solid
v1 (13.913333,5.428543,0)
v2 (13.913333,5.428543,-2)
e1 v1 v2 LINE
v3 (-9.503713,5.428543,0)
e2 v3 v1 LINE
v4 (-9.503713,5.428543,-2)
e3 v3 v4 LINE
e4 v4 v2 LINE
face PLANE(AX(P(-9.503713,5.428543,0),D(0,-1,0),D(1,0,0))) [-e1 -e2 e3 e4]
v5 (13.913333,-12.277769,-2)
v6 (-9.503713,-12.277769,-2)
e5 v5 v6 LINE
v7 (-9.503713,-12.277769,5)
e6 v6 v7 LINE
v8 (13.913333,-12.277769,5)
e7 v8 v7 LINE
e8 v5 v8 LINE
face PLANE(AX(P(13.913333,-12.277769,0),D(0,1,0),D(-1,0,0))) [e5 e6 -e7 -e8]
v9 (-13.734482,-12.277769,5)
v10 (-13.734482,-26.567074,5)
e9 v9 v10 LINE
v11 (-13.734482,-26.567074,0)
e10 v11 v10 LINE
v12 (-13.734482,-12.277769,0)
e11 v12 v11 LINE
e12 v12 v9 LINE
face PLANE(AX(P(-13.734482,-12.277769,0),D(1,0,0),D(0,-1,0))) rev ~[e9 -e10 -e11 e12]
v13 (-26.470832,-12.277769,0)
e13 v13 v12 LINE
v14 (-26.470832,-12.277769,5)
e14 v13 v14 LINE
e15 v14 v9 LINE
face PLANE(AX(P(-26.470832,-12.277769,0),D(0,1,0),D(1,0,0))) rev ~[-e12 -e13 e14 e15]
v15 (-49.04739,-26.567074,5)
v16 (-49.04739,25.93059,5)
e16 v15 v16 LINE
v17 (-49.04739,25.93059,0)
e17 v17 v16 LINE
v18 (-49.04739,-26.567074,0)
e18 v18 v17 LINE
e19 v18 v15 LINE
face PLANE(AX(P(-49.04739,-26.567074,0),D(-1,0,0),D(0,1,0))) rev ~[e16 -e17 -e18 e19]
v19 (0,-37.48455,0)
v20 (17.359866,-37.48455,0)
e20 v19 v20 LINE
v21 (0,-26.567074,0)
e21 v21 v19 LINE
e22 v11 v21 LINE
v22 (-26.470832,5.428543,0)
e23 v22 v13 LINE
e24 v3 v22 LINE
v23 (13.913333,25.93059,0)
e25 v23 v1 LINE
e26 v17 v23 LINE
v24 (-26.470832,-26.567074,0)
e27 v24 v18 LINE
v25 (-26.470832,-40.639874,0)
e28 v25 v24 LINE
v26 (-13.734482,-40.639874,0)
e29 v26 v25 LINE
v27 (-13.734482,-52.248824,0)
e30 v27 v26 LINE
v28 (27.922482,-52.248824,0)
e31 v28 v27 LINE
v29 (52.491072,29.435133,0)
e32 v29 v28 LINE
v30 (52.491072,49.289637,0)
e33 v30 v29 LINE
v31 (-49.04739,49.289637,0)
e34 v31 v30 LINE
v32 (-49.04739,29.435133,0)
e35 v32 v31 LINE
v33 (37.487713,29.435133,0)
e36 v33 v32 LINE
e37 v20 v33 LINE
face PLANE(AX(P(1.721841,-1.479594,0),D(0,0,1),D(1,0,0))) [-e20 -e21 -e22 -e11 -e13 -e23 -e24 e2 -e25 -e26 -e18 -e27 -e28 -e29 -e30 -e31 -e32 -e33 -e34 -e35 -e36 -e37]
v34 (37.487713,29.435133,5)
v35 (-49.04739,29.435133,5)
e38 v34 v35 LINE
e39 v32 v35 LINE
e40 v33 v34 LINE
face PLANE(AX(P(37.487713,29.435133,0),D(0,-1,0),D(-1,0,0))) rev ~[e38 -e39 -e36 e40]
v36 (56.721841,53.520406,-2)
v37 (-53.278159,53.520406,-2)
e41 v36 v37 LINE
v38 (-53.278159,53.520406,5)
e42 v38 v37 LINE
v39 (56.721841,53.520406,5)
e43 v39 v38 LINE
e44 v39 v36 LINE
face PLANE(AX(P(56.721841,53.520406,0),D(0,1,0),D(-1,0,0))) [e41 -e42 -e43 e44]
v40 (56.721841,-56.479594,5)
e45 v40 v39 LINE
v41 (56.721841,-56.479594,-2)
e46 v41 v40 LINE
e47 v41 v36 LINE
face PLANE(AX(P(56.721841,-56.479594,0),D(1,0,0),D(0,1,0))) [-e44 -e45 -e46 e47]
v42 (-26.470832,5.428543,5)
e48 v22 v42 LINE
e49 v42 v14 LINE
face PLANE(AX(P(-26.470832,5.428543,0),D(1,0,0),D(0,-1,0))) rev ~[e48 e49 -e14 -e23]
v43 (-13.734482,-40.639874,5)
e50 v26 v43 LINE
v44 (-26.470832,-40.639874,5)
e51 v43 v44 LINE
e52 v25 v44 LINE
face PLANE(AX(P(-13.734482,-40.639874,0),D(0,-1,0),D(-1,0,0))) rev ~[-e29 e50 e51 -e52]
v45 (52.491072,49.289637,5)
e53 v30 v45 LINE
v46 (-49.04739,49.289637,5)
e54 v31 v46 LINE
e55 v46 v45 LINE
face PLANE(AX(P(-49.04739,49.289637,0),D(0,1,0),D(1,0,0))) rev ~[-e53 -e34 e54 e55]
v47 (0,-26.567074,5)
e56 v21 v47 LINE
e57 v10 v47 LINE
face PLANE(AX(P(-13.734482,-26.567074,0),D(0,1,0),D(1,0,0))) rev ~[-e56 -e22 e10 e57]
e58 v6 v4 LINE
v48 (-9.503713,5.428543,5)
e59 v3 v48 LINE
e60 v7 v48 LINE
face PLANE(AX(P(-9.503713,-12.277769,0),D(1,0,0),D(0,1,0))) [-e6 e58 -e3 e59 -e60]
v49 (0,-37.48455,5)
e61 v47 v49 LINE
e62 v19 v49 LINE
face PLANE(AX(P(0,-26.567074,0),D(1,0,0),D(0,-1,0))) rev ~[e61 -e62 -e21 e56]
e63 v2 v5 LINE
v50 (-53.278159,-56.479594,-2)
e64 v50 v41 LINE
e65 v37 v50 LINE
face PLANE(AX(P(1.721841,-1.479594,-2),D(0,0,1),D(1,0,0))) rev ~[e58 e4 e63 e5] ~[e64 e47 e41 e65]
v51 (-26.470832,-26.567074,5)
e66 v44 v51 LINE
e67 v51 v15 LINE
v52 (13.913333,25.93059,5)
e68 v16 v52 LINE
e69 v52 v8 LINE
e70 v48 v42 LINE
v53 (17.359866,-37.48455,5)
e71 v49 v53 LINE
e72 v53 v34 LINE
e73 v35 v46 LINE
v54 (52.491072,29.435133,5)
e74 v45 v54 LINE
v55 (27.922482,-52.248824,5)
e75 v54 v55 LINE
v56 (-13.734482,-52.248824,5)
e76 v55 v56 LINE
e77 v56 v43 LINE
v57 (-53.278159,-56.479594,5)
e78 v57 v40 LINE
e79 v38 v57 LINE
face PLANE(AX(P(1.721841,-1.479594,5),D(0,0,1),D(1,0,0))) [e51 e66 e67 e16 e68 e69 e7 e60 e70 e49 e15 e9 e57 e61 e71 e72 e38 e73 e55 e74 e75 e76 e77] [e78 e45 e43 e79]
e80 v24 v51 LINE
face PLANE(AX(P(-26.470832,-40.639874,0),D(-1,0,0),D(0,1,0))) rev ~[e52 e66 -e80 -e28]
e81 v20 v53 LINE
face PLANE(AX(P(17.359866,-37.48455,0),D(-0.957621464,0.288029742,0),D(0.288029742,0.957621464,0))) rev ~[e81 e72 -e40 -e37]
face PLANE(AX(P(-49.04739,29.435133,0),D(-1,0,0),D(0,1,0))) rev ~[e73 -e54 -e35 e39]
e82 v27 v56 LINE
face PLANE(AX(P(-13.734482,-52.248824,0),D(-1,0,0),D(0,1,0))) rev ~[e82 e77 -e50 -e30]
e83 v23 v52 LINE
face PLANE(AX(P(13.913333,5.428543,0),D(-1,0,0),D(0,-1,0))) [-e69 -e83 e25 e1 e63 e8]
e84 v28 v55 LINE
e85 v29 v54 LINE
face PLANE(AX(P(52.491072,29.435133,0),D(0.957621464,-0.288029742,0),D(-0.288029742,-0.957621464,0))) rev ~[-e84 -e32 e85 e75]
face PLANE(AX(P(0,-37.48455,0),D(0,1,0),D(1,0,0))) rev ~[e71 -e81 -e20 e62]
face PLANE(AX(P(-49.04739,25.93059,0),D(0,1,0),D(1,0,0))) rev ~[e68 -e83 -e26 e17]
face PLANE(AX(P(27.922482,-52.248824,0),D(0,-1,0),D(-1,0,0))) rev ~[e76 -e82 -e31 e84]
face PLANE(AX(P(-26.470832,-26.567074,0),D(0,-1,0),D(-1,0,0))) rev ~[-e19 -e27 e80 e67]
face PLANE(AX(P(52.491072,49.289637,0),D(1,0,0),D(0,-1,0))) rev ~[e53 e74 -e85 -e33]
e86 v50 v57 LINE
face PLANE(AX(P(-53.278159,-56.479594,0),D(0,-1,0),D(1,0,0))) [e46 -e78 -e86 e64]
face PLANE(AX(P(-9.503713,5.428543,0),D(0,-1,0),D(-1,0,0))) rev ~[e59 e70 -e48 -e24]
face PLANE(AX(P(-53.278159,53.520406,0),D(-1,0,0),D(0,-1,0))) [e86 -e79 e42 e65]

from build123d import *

# Parameters (mm, degrees)
F1_DEPTH = 5
F2_DEPTH = 2


# Not quite as in the source:
# - a feature names something its author has since deleted; it is built from what else it names


with BuildPart() as f1:
    # F0 (on Top) → F1 (new body)
    with BuildSketch(Plane.XY):
        Polygon((-53.2781591106, 53.5204063327), (-53.2781591106, -56.4795936673), (-13.7344817631, -56.4795936673), (56.7218408894, -56.4795936673), (56.7218408894, 53.5204063327), align=None)
        Polygon((-49.0473898798, 29.4351325184), (-49.0473898798, 49.289637102), (52.4910716586, 49.289637102), (52.4910716586, 29.4351325184), (27.9224817305, -52.2488244365), (-13.7344817631, -52.2488244365), (-13.7344817631, -40.6398742527), (-26.4708319562, -40.6398742527), (-26.4708319562, -26.5670741801), (-49.0473898798, -26.5670741801), (-49.0473898798, 5.428542512), (-49.0473898798, 25.9305896417), (-26.4708319562, 25.9305896417), (13.9133328608, 25.9305896417), (13.9133328608, 5.428542512), (13.9133328608, -12.2777693511), (-9.5037125323, -12.2777693511), (-9.5037125323, 5.428542512), (-26.4708319562, 5.428542512), (-26.4708319562, -12.2777693511), (-13.7344817631, -12.2777693511), (-13.7344817631, -26.5670741801), (0, -26.5670741801), (0, -37.4845501322), (17.3598656954, -37.4845501322), (37.487713347, 29.4351325184), align=None, mode=Mode.SUBTRACT)
    extrude(amount=F1_DEPTH)

    # F0 (on Top) → F2 (join)
    with BuildSketch(Plane.XY):
        Polygon((-53.2781591106, 53.5204063327), (-53.2781591106, -56.4795936673), (-13.7344817631, -56.4795936673), (56.7218408894, -56.4795936673), (56.7218408894, 53.5204063327), align=None)
        Polygon((-49.0473898798, 29.4351325184), (-49.0473898798, 49.289637102), (52.4910716586, 49.289637102), (52.4910716586, 29.4351325184), (27.9224817305, -52.2488244365), (-13.7344817631, -52.2488244365), (-13.7344817631, -40.6398742527), (-26.4708319562, -40.6398742527), (-26.4708319562, -26.5670741801), (-49.0473898798, -26.5670741801), (-49.0473898798, 5.428542512), (-49.0473898798, 25.9305896417), (-26.4708319562, 25.9305896417), (13.9133328608, 25.9305896417), (13.9133328608, 5.428542512), (13.9133328608, -12.2777693511), (-9.5037125323, -12.2777693511), (-9.5037125323, 5.428542512), (-26.4708319562, 5.428542512), (-26.4708319562, -12.2777693511), (-13.7344817631, -12.2777693511), (-13.7344817631, -26.5670741801), (0, -26.5670741801), (0, -37.4845501322), (17.3598656954, -37.4845501322), (37.487713347, 29.4351325184), align=None, mode=Mode.SUBTRACT)
        Polygon((52.4910716586, 49.289637102), (-49.0473898798, 49.289637102), (-49.0473898798, 29.4351325184), (37.487713347, 29.4351325184), (17.3598656954, -37.4845501322), (0, -37.4845501322), (0, -26.5670741801), (-13.7344817631, -26.5670741801), (-13.7344817631, -12.2777693511), (-26.4708319562, -12.2777693511), (-26.4708319562, 5.428542512), (-9.5037125323, 5.428542512), (13.9133328608, 5.428542512), (13.9133328608, 25.9305896417), (-26.4708319562, 25.9305896417), (-49.0473898798, 25.9305896417), (-49.0473898798, 5.428542512), (-49.0473898798, -26.5670741801), (-26.4708319562, -26.5670741801), (-26.4708319562, -40.6398742527), (-13.7344817631, -40.6398742527), (-13.7344817631, -52.2488244365), (27.9224817305, -52.2488244365), (52.4910716586, 29.4351325184), align=None)
    extrude(amount=-F2_DEPTH)


solid = f1.part
